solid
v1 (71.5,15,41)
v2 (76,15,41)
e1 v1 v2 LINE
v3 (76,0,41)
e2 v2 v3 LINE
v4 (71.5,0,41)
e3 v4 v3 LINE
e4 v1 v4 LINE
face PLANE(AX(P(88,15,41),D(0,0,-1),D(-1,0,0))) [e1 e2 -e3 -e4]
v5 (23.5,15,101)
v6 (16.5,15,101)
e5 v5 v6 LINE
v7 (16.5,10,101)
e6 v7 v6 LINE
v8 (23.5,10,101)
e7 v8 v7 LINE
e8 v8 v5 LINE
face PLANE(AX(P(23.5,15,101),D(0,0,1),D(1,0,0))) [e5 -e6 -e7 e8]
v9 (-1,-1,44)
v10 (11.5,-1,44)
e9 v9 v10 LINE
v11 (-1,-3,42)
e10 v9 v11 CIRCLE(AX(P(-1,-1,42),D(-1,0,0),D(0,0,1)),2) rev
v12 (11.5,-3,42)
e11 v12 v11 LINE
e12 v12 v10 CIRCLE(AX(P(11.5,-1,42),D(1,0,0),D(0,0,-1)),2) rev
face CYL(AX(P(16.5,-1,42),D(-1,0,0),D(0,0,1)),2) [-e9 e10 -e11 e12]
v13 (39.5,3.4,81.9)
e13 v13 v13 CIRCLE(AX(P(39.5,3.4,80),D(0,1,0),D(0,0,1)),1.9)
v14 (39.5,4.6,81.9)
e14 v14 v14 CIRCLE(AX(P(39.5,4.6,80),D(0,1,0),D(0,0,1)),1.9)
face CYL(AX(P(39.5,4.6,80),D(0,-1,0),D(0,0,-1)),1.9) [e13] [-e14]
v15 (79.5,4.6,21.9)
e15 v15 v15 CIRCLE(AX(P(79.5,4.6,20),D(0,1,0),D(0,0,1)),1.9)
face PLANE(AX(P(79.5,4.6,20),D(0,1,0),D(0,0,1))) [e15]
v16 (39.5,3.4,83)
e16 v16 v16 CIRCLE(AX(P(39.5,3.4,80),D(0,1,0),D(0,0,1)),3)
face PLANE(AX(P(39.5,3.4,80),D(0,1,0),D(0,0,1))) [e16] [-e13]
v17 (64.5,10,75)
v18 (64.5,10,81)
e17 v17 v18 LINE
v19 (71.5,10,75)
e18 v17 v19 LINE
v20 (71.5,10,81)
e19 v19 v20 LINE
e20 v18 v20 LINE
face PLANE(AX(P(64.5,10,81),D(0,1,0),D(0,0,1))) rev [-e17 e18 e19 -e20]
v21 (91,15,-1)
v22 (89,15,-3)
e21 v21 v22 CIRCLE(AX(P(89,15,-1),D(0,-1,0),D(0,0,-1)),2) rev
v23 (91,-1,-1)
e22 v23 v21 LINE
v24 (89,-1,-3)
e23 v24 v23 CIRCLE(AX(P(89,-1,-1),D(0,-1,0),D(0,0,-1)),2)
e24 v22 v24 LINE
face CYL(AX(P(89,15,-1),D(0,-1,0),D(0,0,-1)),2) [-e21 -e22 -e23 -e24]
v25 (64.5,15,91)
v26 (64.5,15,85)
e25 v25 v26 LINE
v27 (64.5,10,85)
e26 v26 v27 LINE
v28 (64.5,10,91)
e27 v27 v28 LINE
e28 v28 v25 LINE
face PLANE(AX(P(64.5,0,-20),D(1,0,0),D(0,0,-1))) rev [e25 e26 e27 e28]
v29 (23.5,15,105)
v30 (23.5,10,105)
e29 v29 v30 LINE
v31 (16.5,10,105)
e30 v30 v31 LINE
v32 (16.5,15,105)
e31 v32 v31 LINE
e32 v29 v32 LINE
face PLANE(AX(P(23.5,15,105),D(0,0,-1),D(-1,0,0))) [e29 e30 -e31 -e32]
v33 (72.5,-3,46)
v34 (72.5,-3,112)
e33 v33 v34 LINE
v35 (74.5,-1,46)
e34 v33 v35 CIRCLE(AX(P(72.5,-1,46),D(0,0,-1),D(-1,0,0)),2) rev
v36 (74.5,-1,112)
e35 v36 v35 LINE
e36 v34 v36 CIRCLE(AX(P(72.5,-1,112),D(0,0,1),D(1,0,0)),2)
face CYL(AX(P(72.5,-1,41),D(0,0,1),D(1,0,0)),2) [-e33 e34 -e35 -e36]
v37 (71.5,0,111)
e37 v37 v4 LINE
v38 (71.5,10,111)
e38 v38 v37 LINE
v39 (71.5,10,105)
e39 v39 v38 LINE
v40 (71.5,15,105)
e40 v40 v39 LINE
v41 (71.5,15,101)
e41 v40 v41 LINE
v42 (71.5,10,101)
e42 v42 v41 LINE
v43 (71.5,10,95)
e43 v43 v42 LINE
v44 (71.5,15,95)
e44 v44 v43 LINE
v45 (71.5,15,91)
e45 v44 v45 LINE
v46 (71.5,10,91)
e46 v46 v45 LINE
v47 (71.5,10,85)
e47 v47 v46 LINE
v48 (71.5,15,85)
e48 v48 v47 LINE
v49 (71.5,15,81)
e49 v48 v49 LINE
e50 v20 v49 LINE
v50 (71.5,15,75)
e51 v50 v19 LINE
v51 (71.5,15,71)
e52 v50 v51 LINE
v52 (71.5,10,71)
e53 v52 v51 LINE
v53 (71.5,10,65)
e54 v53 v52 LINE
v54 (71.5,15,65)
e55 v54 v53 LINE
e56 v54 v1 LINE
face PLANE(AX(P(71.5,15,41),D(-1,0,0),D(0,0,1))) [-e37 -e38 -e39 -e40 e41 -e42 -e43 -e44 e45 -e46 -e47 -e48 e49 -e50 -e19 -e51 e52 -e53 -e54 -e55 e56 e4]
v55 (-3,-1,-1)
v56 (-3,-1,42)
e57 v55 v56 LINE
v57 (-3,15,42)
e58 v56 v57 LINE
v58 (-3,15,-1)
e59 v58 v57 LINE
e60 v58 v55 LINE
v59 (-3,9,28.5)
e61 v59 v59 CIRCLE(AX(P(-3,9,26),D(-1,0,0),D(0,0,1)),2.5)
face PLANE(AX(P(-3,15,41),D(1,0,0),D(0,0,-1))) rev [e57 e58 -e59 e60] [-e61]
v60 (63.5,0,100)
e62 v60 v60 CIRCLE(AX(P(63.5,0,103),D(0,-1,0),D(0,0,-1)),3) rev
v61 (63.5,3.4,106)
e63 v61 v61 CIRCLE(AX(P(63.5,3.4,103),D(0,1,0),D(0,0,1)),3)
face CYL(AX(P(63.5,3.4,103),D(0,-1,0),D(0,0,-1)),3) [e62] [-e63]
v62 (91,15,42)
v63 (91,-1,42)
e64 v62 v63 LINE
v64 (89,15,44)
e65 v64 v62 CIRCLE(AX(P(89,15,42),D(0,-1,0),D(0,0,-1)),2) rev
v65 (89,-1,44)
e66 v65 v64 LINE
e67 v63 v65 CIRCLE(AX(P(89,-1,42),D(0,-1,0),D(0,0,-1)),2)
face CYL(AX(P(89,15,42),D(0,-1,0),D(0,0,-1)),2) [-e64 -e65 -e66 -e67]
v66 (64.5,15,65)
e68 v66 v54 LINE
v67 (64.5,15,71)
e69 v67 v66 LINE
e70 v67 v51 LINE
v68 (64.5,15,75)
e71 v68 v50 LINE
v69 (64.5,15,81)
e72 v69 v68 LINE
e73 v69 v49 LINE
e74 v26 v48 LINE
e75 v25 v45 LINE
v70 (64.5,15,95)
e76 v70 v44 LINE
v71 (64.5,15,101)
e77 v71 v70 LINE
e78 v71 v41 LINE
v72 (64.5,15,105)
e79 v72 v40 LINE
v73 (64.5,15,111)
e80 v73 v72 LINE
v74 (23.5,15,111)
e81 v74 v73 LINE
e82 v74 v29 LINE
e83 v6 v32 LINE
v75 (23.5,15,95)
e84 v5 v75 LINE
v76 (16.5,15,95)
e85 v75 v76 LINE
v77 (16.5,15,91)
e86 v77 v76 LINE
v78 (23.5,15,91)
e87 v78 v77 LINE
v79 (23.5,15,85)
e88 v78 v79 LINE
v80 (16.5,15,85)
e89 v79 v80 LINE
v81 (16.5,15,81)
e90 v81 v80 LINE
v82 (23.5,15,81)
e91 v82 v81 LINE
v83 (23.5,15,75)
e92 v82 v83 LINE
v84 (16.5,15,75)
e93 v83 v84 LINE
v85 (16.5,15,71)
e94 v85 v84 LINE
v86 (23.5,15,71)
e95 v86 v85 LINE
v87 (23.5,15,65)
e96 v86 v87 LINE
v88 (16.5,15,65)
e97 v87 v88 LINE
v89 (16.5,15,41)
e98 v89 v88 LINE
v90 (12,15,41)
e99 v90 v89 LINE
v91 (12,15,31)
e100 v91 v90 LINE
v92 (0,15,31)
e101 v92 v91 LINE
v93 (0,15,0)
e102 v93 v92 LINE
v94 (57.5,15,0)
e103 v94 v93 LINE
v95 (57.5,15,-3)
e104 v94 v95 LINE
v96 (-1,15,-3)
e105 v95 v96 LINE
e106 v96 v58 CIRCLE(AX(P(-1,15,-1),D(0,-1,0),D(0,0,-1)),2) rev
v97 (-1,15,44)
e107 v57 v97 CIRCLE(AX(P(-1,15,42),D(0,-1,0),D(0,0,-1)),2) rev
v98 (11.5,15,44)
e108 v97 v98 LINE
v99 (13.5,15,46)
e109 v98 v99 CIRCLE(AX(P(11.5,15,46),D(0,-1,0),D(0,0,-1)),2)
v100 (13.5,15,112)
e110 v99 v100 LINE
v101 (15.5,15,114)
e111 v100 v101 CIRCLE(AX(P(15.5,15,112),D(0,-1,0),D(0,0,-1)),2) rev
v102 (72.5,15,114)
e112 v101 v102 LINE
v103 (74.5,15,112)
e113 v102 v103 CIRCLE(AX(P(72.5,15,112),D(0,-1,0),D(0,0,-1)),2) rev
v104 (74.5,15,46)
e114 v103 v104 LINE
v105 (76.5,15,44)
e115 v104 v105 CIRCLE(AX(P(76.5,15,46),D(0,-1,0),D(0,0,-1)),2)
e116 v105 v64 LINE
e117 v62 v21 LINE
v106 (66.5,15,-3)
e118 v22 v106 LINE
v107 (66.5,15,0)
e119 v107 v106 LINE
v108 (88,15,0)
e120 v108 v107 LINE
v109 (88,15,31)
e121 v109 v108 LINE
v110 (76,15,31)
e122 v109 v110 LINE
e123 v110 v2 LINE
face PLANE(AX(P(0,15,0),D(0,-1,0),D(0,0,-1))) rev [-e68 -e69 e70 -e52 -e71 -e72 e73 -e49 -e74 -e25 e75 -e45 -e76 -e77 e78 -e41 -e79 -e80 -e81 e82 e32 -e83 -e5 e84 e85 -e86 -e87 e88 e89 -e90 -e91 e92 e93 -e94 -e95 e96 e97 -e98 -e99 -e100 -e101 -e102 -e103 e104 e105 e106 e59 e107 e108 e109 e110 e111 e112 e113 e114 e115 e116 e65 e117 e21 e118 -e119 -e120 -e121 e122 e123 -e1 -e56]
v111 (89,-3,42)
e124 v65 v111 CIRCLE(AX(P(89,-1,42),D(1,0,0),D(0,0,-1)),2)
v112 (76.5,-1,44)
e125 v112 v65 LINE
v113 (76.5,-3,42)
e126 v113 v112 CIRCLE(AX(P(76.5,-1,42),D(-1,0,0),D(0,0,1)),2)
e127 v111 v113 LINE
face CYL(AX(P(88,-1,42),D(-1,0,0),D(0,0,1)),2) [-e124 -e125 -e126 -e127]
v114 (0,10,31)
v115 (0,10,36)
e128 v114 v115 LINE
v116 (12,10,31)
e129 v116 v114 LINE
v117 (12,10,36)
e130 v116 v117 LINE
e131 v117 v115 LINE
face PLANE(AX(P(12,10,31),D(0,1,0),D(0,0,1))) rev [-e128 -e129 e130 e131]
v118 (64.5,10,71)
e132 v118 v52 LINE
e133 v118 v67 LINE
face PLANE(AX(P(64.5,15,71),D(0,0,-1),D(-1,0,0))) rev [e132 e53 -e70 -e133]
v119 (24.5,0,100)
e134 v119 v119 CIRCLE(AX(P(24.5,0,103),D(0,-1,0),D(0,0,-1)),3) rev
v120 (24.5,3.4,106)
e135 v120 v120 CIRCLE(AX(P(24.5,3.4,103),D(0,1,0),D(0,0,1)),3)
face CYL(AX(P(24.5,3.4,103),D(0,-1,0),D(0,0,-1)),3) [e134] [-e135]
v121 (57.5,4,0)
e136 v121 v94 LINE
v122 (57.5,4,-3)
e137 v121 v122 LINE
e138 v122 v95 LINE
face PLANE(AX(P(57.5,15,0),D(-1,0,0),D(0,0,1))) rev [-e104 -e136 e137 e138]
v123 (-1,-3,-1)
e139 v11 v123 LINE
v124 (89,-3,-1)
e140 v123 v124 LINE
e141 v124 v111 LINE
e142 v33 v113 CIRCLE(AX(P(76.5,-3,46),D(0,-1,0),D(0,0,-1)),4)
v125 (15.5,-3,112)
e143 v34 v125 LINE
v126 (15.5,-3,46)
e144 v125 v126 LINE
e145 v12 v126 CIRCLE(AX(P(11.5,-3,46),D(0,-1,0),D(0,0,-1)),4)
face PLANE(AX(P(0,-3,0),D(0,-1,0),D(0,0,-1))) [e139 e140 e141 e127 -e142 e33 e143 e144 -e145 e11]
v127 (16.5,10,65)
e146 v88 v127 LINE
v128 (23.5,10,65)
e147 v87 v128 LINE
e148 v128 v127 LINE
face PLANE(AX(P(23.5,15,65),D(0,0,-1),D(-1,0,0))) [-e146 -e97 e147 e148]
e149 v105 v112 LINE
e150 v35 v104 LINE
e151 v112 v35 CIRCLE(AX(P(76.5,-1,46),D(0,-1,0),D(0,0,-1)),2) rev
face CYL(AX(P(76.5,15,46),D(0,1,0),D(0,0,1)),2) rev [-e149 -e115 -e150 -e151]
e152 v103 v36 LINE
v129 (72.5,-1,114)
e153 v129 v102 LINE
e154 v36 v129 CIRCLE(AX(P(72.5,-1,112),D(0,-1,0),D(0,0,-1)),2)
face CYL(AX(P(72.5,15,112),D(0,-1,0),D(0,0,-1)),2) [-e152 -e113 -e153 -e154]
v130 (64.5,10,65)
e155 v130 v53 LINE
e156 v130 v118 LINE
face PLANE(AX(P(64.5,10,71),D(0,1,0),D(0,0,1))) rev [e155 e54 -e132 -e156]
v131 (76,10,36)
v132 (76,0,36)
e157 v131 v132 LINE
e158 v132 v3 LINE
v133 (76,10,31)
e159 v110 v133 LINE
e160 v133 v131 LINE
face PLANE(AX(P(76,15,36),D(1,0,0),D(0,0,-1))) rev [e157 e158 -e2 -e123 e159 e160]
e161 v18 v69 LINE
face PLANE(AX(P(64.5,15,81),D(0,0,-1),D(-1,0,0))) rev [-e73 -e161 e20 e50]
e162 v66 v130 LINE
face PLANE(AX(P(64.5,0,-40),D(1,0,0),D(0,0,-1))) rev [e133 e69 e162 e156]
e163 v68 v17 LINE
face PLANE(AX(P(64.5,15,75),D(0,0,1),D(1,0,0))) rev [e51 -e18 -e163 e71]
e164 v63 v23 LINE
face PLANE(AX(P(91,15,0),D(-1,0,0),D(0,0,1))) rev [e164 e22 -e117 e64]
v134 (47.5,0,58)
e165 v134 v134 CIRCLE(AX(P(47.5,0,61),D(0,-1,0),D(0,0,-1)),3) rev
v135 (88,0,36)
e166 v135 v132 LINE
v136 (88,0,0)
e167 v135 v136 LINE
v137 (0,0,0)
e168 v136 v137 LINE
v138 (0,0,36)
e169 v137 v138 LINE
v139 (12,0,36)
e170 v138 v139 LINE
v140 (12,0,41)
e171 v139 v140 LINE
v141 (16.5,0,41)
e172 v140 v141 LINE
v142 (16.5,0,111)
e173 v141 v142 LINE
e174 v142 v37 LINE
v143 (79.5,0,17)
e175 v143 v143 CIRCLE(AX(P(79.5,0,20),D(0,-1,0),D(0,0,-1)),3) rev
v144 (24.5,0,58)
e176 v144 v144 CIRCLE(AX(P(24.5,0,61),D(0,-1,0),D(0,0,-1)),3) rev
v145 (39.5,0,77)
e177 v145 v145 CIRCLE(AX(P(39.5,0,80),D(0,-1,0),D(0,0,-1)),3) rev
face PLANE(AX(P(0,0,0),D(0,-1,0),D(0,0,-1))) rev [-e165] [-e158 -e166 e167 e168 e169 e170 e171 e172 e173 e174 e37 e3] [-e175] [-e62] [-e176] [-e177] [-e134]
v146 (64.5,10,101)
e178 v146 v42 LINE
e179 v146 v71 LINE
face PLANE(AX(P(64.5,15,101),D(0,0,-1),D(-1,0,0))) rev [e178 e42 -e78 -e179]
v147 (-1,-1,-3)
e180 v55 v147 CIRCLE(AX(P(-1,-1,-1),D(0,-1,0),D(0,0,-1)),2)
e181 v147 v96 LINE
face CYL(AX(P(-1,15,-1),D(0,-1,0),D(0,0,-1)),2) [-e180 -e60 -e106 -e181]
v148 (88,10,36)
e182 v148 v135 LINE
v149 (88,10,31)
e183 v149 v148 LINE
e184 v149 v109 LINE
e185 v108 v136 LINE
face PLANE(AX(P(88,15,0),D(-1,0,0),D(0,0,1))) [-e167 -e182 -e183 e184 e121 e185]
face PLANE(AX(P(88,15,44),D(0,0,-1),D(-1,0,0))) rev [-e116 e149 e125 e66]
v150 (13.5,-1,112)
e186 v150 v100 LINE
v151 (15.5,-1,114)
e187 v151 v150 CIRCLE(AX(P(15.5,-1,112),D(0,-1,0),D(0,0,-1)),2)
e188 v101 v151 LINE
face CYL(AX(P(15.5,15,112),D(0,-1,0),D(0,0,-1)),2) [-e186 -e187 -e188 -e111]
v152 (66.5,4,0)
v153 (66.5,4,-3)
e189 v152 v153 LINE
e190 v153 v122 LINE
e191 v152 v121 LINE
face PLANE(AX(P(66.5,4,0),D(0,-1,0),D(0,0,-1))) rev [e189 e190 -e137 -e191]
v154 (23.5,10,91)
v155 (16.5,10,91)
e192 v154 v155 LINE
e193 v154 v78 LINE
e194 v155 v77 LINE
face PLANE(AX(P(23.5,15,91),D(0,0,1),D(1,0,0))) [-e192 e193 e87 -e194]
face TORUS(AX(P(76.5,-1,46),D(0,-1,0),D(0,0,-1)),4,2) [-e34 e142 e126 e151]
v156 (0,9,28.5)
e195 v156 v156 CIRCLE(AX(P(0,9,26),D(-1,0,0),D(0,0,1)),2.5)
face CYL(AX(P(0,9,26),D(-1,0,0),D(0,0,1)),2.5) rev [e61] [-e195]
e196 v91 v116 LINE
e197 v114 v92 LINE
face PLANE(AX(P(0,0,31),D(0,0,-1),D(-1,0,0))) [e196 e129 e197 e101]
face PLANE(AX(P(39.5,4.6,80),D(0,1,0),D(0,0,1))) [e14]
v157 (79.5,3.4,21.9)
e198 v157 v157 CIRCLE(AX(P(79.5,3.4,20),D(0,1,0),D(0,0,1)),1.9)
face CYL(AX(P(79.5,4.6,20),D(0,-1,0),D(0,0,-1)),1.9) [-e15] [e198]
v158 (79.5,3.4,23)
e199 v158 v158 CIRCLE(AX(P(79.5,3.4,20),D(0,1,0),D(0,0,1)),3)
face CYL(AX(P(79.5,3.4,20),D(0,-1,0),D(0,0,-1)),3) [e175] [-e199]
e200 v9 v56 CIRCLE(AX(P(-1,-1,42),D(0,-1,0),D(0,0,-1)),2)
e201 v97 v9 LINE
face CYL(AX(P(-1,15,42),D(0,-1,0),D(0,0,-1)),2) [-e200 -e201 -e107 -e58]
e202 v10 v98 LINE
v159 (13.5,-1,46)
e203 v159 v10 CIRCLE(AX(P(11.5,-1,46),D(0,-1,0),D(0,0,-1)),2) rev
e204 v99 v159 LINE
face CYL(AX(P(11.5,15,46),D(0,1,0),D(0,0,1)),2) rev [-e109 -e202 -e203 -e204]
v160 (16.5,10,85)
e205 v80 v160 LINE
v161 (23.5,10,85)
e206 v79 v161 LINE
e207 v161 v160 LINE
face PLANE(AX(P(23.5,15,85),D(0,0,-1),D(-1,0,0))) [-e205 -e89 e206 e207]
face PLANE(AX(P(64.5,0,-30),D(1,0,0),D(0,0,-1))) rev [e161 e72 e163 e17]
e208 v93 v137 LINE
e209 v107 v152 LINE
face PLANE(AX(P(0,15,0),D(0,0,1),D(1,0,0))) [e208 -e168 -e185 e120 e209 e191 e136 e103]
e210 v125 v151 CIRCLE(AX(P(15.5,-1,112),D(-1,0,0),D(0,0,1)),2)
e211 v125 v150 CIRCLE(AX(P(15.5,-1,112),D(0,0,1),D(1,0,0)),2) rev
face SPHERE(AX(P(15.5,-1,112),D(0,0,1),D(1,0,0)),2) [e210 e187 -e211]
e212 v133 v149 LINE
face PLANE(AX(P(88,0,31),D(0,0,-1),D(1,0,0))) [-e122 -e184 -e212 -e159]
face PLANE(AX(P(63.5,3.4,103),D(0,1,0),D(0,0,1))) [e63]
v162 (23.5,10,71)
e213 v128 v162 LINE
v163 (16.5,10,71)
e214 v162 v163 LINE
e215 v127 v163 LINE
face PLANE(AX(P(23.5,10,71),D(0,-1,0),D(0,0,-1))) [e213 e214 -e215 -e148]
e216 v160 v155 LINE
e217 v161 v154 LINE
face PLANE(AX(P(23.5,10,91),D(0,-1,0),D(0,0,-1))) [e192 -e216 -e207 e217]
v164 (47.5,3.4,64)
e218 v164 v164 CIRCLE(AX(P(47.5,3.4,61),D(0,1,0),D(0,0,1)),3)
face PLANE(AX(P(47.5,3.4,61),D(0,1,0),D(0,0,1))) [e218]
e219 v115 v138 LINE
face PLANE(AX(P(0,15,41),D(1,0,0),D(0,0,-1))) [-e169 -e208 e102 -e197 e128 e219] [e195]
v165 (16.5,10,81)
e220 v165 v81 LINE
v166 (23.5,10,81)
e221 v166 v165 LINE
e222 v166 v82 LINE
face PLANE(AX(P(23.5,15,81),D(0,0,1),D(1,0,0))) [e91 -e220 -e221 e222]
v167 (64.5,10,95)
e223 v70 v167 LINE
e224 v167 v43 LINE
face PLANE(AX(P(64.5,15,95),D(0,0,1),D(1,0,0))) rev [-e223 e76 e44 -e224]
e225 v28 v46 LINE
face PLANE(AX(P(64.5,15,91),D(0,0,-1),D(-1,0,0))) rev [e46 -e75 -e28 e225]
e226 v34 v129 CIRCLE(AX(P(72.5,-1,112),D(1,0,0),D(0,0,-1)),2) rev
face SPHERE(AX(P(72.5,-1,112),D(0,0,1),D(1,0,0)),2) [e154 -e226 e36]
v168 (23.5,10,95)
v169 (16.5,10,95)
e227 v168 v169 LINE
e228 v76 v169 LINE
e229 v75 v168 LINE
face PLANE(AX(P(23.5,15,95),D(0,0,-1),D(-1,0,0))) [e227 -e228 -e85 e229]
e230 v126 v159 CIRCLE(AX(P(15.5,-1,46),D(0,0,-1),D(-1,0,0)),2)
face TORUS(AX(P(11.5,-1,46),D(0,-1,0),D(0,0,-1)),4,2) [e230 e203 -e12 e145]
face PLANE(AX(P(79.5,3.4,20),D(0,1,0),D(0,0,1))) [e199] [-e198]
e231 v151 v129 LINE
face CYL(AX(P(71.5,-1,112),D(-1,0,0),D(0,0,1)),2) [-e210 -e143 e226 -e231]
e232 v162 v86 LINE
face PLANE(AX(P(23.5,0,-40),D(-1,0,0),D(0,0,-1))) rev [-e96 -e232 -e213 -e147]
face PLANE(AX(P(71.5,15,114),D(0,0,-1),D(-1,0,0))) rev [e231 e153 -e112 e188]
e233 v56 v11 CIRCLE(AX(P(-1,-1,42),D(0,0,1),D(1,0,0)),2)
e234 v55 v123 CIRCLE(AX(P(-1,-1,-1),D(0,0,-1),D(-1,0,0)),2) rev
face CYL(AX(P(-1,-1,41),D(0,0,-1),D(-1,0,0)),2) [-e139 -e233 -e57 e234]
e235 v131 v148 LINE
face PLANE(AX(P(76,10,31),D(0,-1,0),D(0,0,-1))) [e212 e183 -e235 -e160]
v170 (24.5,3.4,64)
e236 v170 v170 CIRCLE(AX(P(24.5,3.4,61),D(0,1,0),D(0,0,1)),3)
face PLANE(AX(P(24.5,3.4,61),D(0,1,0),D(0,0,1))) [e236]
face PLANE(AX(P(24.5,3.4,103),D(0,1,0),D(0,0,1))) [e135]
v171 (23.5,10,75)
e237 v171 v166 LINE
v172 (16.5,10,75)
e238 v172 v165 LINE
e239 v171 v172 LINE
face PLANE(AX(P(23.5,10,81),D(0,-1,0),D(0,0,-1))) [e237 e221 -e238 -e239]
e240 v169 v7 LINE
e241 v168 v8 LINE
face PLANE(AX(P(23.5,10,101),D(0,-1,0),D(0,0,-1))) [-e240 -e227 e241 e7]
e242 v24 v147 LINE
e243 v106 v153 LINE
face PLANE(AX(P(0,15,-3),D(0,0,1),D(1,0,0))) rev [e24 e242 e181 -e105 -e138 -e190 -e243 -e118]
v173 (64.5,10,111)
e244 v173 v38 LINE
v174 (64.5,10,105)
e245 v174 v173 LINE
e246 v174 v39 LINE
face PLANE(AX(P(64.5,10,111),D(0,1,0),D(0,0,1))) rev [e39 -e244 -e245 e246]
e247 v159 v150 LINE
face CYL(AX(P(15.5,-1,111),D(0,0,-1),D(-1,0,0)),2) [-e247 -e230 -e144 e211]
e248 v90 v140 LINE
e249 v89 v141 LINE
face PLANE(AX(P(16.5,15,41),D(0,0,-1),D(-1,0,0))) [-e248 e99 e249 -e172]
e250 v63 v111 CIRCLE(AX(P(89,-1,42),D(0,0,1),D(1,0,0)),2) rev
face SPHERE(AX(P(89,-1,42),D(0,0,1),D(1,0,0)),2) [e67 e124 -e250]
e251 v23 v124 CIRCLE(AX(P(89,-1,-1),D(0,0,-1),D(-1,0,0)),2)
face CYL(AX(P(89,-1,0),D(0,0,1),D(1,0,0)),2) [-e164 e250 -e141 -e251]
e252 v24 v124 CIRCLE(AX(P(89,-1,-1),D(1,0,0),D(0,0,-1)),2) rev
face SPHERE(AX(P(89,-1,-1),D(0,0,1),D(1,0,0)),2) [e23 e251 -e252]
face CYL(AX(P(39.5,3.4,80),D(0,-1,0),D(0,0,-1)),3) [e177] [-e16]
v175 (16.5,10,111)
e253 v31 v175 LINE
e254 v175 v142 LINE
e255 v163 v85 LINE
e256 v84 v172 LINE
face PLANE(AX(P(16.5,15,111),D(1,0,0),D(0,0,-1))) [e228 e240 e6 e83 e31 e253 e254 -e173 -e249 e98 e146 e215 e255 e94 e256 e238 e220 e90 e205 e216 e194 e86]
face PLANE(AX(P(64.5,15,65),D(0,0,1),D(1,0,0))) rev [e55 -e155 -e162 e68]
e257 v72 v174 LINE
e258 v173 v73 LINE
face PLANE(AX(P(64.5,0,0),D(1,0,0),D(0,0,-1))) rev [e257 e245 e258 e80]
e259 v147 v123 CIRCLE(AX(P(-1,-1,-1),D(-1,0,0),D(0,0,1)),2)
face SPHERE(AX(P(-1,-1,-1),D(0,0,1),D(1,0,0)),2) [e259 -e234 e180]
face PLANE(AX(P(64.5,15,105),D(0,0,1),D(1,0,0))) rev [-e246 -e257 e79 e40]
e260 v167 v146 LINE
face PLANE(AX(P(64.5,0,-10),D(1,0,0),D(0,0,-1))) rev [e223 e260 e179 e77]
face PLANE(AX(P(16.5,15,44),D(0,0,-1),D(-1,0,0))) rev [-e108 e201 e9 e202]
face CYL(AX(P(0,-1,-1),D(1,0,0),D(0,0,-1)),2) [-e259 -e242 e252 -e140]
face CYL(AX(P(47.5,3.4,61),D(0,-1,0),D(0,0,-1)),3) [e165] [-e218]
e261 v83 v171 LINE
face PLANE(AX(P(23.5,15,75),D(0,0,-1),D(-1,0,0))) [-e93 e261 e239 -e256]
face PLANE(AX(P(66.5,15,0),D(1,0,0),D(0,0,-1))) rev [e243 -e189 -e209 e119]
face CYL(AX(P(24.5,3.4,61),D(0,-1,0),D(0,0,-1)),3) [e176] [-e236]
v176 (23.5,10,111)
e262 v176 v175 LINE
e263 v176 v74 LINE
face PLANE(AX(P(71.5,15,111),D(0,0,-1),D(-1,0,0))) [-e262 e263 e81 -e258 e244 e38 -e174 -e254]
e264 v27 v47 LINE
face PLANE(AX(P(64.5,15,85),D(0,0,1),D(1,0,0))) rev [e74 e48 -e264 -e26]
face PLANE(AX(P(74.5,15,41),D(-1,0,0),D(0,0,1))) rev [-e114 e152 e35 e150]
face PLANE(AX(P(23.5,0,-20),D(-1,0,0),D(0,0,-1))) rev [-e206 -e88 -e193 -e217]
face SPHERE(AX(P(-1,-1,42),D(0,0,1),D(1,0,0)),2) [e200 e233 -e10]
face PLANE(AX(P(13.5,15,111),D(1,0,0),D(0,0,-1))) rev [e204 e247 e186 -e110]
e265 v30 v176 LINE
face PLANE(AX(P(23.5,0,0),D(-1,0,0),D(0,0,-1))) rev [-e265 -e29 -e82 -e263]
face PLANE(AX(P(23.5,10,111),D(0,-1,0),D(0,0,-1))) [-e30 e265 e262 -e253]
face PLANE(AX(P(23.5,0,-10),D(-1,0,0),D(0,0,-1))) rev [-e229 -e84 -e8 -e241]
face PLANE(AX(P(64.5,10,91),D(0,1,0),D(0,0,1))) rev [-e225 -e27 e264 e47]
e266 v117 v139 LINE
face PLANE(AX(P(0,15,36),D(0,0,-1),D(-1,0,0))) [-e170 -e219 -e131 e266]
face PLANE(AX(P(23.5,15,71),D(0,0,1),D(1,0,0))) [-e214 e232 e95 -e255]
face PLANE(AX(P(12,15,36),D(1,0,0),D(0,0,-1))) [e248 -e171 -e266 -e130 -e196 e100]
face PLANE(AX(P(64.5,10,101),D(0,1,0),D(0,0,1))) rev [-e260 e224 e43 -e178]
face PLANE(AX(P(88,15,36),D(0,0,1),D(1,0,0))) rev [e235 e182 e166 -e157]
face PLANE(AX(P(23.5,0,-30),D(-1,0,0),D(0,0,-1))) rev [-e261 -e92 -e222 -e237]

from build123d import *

# Parameters (mm, degrees)
BOSS_EXTRUDE1_DEPTH       = 15
SHELL1_T                  = 3
SKETCH3_W                 = 9
SKETCH3_H                 = 11
CUT_EXTRUDE1_DEPTH        = 3
SKETCH4_R                 = 2.5
CUT_EXTRUDE2_DEPTH        = 3
FILLET1_R                 = 2
SKETCH5_R                 = 3
BOSS_EXTRUDE2_DEPTH       = 3.4
SKETCH6_R                 = 1.9
BOSS_EXTRUDE3_DEPTH       = 1.2
SKETCH_PATTERN1_OUTLINE_R = 3
SKETCH_PATTERN1_DEPTH     = 3.4
SKETCH9_W                 = 12
SKETCH9_H                 = 5
BOSS_EXTRUDE4_DEPTH       = 15
SKETCH10_W                = 12
SKETCH10_H                = 5
BOSS_EXTRUDE5_DEPTH       = 5
SKETCH11_W                = 6
SKETCH11_H                = 5
BOSS_EXTRUDE6_DEPTH       = 7
LPATTERN1_COUNT           = 5
LPATTERN1_PITCH           = 10
MIRROR2_COPY_1_SKETCH_W   = 6
MIRROR2_COPY_1_SKETCH_H   = 5
MIRROR2_COPY_1_DEPTH      = 7
MIRROR2_COPY_2_SKETCH_W   = 6
MIRROR2_COPY_2_SKETCH_H   = 5
MIRROR2_COPY_2_DEPTH      = 7
MIRROR2_COPY_3_SKETCH_W   = 6
MIRROR2_COPY_3_SKETCH_H   = 5
MIRROR2_COPY_3_DEPTH      = 7
MIRROR2_COPY_4_SKETCH_W   = 6
MIRROR2_COPY_4_SKETCH_H   = 5
MIRROR2_COPY_4_DEPTH      = 7


# Read off the part's stored shape, not the designer's step: Sketch-Pattern1
with BuildPart() as part:
    # Sketch1 → Boss-Extrude1 (new body)
    with BuildSketch(Plane(origin=(0, 0, 0), x_dir=(1, 0, 0), z_dir=(0, 1, 0))):
        Polygon((0, 0), (88, 0), (88, -41), (71.5, -41), (71.5, -111), (16.5, -111), (16.5, -41), (0, -41), align=None)
    extrude(amount=BOSS_EXTRUDE1_DEPTH)

    # Shell1
    shell1_openings = [part.faces().sort_by_distance(p)[0] for p in [
        (44, 15, 49.150442478),
    ]]
    offset(amount=SHELL1_T, openings=shell1_openings, kind=Kind.INTERSECTION)

    # Sketch3 → Cut-Extrude1 (cut)
    with BuildSketch(Plane(origin=(0, 0, -3), x_dir=(-1, 0, 0), z_dir=(0, 0, -1))):
        with Locations((-62, 9.5)):
            Rectangle(SKETCH3_W, SKETCH3_H)
    extrude(amount=-CUT_EXTRUDE1_DEPTH, mode=Mode.SUBTRACT)

    # Sketch4 → Cut-Extrude2 (cut)
    with BuildSketch(Plane.ZY.offset(3)):
        with Locations((26, 9)):
            Circle(SKETCH4_R)
    extrude(amount=-CUT_EXTRUDE2_DEPTH, mode=Mode.SUBTRACT)

    # Fillet1
    fillet1_edges = [part.edges().sort_by_distance(p)[0] for p in [
        (44, -3, 114),
        (13.5, -3, 79),
        (5.25, -3, 44),
        (-3, -3, 20.5),
        (-3, 6, -3),
        (91, 6, -3),
        (91, 6, 44),
        (74.5, 6, 44),
        (74.5, 6, 114),
        (13.5, 6, 114),
        (13.5, 6, 44),
        (-3, 6, 44),
        (44, -3, -3),
        (91, -3, 20.5),
        (82.75, -3, 44),
        (74.5, -3, 79),
    ]]
    fillet(fillet1_edges, radius=FILLET1_R)

    # Sketch5 → Boss-Extrude2 (add)
    with BuildSketch(Plane(origin=(0, 0, 0), x_dir=(1, 0, 0), z_dir=(0, 1, 0))):
        with Locations(Location((39.5, -80, 0), (0, 0, 90))):
            Circle(SKETCH5_R)
        with Locations(Location((79.5, -20, 0), (0, 0, 90))):
            Circle(SKETCH5_R)
    extrude(amount=BOSS_EXTRUDE2_DEPTH)

    # Sketch6 → Boss-Extrude3 (add)
    with BuildSketch(Plane(origin=(0, 3.4, 0), x_dir=(1, 0, 0), z_dir=(0, 1, 0))):
        with Locations(Location((39.5, -80, 0), (0, 0, 270))):
            Circle(SKETCH6_R)
        with Locations(Location((79.5, -20, 0), (0, 0, 270))):
            Circle(SKETCH6_R)
    extrude(amount=BOSS_EXTRUDE3_DEPTH)

    # Sketch-Pattern1 outline → Sketch-Pattern1 (add)
    with BuildSketch(Plane(origin=(0, 0, 0), x_dir=(1, 0, 0), z_dir=(0, 1, 0))):
        with Locations((63.5, -103)):
            Circle(SKETCH_PATTERN1_OUTLINE_R)
        with Locations((24.5, -103)):
            Circle(SKETCH_PATTERN1_OUTLINE_R)
        with Locations((24.5, -61)):
            Circle(SKETCH_PATTERN1_OUTLINE_R)
        with Locations((47.5, -61)):
            Circle(SKETCH_PATTERN1_OUTLINE_R)
    extrude(amount=SKETCH_PATTERN1_DEPTH)

    # Sketch9 → Boss-Extrude4 (add)
    with BuildSketch(Plane(origin=(0, 0, 0), x_dir=(1, 0, 0), z_dir=(0, 1, 0))):
        with Locations((6, -38.5)):
            Rectangle(SKETCH9_W, SKETCH9_H)
        with Locations((82, -38.5)):
            Rectangle(SKETCH9_W, SKETCH9_H)
    extrude(amount=BOSS_EXTRUDE4_DEPTH)

    # Sketch10 → Boss-Extrude5 (add)
    with BuildSketch(Plane(origin=(0, 0, 36), x_dir=(-1, 0, 0), z_dir=(0, 0, -1))):
        with Locations((-6, 12.5)):
            Rectangle(SKETCH10_W, SKETCH10_H)
    boss_extrude5 = extrude(amount=BOSS_EXTRUDE5_DEPTH)

    # Mirror1: Boss-Extrude5 across plane
    add(boss_extrude5.mirror(Plane.ZY.offset(-44)))

    # Sketch11 → Boss-Extrude6 (add)
    with BuildSketch(Plane.ZY.offset(-71.5)):
        with Locations((108, 12.5)):
            Rectangle(SKETCH11_W, SKETCH11_H)
    boss_extrude6 = extrude(amount=BOSS_EXTRUDE6_DEPTH)

    # LPattern1: Boss-Extrude6 ×5
    with Locations(*[(0, 0, -i * LPATTERN1_PITCH) for i in range(1, LPATTERN1_COUNT)]):
        add(boss_extrude6)

    # Mirror2: Boss-Extrude6 across plane
    add(boss_extrude6.mirror(Plane.ZY.offset(-44)))

    # Mirror2 copy 1 sketch → Mirror2 copy 1 (add)
    with BuildSketch(Plane(origin=(16.5, 0, -10), x_dir=(0, 0, 1), z_dir=(1, 0, 0))):
        with Locations((108, -12.5)):
            Rectangle(MIRROR2_COPY_1_SKETCH_W, MIRROR2_COPY_1_SKETCH_H)
    extrude(amount=MIRROR2_COPY_1_DEPTH)

    # Mirror2 copy 2 sketch → Mirror2 copy 2 (add)
    with BuildSketch(Plane(origin=(16.5, 0, -20), x_dir=(0, 0, 1), z_dir=(1, 0, 0))):
        with Locations((108, -12.5)):
            Rectangle(MIRROR2_COPY_2_SKETCH_W, MIRROR2_COPY_2_SKETCH_H)
    extrude(amount=MIRROR2_COPY_2_DEPTH)

    # Mirror2 copy 3 sketch → Mirror2 copy 3 (add)
    with BuildSketch(Plane(origin=(16.5, 0, -30), x_dir=(0, 0, 1), z_dir=(1, 0, 0))):
        with Locations((108, -12.5)):
            Rectangle(MIRROR2_COPY_3_SKETCH_W, MIRROR2_COPY_3_SKETCH_H)
    extrude(amount=MIRROR2_COPY_3_DEPTH)

    # Mirror2 copy 4 sketch → Mirror2 copy 4 (add)
    with BuildSketch(Plane(origin=(16.5, 0, -40), x_dir=(0, 0, 1), z_dir=(1, 0, 0))):
        with Locations((108, -12.5)):
            Rectangle(MIRROR2_COPY_4_SKETCH_W, MIRROR2_COPY_4_SKETCH_H)
    extrude(amount=MIRROR2_COPY_4_DEPTH)


solid = part.part
